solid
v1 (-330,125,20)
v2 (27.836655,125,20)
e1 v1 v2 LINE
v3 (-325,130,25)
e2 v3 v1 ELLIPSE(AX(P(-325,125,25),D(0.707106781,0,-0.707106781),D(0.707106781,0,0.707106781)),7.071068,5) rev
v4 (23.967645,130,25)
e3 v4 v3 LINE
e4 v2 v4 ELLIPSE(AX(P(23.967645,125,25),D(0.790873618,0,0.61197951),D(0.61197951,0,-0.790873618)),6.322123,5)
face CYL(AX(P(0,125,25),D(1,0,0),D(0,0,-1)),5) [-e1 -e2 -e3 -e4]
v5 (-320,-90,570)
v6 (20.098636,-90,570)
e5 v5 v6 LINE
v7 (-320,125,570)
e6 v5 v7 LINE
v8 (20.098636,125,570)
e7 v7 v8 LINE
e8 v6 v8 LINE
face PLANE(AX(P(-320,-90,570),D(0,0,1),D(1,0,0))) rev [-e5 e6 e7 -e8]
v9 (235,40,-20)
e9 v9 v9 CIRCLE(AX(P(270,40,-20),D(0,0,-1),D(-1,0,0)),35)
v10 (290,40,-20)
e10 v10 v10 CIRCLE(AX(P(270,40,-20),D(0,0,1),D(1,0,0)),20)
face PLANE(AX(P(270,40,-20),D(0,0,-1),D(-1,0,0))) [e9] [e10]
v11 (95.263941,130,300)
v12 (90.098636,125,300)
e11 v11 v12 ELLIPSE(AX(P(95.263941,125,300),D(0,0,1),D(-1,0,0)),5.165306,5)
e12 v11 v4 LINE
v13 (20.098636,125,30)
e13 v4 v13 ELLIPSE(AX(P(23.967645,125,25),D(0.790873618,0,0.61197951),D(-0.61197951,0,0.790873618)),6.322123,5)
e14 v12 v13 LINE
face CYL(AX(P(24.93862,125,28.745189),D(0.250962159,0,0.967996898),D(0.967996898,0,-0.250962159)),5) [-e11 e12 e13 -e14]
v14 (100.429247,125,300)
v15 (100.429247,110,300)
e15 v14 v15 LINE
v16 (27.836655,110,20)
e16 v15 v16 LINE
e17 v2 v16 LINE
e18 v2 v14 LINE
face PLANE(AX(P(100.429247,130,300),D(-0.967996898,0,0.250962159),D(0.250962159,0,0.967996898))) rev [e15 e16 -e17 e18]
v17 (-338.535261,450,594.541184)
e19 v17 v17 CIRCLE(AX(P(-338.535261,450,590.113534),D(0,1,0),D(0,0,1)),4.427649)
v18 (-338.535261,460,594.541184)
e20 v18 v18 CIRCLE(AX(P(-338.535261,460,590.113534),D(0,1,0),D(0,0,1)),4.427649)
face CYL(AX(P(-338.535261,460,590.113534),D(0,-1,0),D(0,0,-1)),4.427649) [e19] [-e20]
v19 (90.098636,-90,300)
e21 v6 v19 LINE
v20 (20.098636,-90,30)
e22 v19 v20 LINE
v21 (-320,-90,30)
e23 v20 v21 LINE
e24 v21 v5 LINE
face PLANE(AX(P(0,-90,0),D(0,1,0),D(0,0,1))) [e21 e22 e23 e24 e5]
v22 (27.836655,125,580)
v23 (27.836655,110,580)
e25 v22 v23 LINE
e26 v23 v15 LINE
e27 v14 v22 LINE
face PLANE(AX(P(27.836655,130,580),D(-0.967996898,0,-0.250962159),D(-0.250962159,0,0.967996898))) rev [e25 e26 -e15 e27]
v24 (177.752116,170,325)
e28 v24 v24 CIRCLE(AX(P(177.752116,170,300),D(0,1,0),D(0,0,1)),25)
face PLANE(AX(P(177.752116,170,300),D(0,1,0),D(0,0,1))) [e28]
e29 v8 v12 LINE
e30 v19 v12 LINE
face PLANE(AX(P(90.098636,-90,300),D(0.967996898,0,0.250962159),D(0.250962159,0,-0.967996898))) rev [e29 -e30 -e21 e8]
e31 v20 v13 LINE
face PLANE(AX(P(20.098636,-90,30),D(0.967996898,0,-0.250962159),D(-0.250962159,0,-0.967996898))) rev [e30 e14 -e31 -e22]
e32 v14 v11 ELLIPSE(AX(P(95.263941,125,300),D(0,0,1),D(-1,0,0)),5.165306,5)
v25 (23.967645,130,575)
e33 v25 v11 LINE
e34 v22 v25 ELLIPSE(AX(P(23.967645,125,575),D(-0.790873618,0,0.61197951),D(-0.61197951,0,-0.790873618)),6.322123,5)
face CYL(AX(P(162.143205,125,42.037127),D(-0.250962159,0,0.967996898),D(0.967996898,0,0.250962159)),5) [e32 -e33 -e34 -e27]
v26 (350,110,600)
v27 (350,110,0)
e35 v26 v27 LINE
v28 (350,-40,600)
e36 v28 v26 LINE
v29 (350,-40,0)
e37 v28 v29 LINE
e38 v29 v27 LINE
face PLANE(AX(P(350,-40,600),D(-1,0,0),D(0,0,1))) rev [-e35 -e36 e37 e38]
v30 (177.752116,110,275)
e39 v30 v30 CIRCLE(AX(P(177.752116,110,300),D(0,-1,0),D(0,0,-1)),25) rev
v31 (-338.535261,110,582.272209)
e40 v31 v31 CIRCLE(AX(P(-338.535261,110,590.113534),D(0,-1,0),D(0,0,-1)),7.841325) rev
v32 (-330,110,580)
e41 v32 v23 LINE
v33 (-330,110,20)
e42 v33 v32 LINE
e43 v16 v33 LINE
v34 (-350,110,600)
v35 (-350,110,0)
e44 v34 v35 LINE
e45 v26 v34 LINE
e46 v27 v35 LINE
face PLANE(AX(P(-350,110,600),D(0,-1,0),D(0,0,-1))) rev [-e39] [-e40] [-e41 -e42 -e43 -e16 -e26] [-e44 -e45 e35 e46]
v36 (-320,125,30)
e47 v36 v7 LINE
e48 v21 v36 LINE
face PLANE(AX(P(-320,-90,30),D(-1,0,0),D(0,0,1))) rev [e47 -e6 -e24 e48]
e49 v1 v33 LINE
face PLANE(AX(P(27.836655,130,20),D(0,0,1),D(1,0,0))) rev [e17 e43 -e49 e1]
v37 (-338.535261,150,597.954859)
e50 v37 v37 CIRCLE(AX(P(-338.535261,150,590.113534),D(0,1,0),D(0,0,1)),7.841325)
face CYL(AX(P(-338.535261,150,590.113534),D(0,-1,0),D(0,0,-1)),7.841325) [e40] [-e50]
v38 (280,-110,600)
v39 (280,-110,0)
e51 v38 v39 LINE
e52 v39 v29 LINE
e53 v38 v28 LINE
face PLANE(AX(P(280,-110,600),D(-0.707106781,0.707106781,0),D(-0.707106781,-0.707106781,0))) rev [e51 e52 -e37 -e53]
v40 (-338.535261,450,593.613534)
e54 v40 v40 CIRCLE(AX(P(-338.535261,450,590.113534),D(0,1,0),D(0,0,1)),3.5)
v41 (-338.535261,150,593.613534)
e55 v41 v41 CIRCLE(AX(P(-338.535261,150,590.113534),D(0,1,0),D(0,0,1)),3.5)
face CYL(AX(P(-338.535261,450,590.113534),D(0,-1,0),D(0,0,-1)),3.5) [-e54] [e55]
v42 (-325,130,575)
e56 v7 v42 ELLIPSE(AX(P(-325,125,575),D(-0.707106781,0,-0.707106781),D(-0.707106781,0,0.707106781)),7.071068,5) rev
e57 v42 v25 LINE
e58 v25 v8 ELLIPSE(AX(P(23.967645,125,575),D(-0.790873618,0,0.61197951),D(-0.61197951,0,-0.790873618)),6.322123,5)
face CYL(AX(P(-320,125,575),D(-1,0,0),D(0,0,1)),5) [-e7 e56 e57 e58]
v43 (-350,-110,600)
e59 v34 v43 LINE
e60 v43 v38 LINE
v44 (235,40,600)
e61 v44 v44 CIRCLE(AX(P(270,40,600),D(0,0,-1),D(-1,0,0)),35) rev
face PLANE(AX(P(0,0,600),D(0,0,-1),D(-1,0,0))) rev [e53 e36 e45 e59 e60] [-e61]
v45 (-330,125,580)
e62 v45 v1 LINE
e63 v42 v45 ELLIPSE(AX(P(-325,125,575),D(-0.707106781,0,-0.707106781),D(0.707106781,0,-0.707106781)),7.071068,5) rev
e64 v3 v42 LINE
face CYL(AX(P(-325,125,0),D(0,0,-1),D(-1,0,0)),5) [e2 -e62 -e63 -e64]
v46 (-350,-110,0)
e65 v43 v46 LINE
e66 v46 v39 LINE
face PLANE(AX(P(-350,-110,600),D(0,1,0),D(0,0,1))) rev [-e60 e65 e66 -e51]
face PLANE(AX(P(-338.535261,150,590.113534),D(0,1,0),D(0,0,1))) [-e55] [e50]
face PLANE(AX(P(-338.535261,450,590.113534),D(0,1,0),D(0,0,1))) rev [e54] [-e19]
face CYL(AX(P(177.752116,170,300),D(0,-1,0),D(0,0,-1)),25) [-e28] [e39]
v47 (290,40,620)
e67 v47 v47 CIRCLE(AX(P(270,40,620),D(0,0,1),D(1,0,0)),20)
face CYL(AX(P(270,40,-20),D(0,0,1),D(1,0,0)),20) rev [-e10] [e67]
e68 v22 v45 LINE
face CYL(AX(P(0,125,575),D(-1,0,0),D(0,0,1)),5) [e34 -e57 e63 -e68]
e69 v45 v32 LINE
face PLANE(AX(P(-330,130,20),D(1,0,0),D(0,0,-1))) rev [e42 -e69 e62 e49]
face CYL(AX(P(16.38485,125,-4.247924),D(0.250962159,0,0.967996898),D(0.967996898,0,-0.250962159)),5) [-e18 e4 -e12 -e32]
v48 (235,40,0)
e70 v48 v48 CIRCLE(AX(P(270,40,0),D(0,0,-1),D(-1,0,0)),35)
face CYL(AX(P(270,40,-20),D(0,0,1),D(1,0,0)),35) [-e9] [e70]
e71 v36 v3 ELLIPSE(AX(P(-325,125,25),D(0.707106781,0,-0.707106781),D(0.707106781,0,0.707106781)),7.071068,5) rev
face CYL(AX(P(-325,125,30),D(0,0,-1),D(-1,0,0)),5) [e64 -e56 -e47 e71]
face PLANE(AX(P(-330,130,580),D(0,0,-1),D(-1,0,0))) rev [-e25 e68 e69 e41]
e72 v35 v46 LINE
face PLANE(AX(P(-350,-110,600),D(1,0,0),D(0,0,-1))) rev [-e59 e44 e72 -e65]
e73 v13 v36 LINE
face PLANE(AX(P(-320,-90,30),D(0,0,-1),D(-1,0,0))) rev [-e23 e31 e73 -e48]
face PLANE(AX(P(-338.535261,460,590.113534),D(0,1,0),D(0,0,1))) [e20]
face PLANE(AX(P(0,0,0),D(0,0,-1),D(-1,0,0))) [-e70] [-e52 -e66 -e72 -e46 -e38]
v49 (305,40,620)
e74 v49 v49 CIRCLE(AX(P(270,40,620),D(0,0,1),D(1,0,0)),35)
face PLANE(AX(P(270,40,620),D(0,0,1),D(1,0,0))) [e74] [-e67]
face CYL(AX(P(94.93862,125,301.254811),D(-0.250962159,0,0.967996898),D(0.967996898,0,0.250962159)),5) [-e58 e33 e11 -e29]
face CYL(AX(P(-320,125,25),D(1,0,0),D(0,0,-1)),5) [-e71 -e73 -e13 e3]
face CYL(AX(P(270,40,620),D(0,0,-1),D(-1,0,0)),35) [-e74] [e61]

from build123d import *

# Parameters (mm, degrees)
BOSS_EXTRUDE1_DEPTH = 600
CUT_EXTRUDE1_DEPTH  = 200
BOSS_EXTRUDE2_DEPTH = 20
FILLET1_R           = 5
SKETCH4_R           = 35
BOSS_EXTRUDE3_DEPTH = 20
BOSS_EXTRUDE4_START = 20
SKETCH5_R           = 35
BOSS_EXTRUDE4_DEPTH = 20
SKETCH6_R           = 10
CUT_EXTRUDE2_DEPTH  = 741.945342114
SKETCH7_R           = 25
BOSS_EXTRUDE5_DEPTH = 60
SKETCH9_R           = 20
CUT_EXTRUDE3_DEPTH  = 749.999332443
SKETCH10_R          = 7.841324839
BOSS_EXTRUDE6_DEPTH = 40
SKETCH11_R          = 3.5
BOSS_EXTRUDE7_DEPTH = 300
SKETCH12_R          = 4.427649499
BOSS_EXTRUDE8_DEPTH = 10


with BuildPart() as part:
    # Sketch1 → Boss-Extrude1 (new body)
    with BuildSketch(Plane.XY):
        Polygon((280, -110), (350, -40), (350, 110), (-350, 110), (-350, -110), align=None)
    extrude(amount=BOSS_EXTRUDE1_DEPTH)

    # Sketch2 → Cut-Extrude1 (cut)
    with BuildSketch(Plane(origin=(0, 110, 0), x_dir=(1, 0, 0), z_dir=(0, 1, 0))):
        Polygon((20.098635598, -30), (90.098635598, -300), (20.098635598, -570), (-320, -570), (-320, -30), align=None)
    extrude(amount=-CUT_EXTRUDE1_DEPTH, mode=Mode.SUBTRACT)

    # Sketch3 → Boss-Extrude2 (add)
    with BuildSketch(Plane(origin=(0, 110, 0), x_dir=(1, 0, 0), z_dir=(0, 1, 0))):
        Polygon((-330, -20), (-330, -580), (27.836654621, -580), (100.429247214, -300), (27.836654621, -20), align=None)
        Polygon((-320, -30), (-320, -570), (20.098635598, -570), (90.098635598, -300), (20.098635598, -30), align=None, mode=Mode.SUBTRACT)
    extrude(amount=BOSS_EXTRUDE2_DEPTH)

    # Fillet1
    fillet1_edges = [part.edges().sort_by_distance(p)[0] for p in [
        (-151.081672689, 130, 20),
        (-330, 130, 300),
        (-151.081672689, 130, 580),
        (64.132950917, 130, 440),
        (64.132950917, 130, 160),
        (-149.950682201, 130, 30),
        (-320, 130, 300),
        (-149.950682201, 130, 570),
        (55.098635598, 130, 435),
        (55.098635598, 130, 165),
    ]]
    fillet(fillet1_edges, radius=FILLET1_R - 0.0001)  # a hair under: the kernel refuses the full size

    # Sketch4 → Boss-Extrude3 (add)
    with BuildSketch(Plane.XY.offset(600)):
        with Locations(Location((270, 40, 0), (0, 0, 180))):
            Circle(SKETCH4_R)
    extrude(amount=BOSS_EXTRUDE3_DEPTH)

    # Sketch5 → Boss-Extrude4 (add)
    with BuildSketch(Plane(origin=(0, 0, 0), x_dir=(-1, 0, 0), z_dir=(0, 0, -1)).offset(BOSS_EXTRUDE4_START)):
        with Locations((-270, 40)):
            Circle(SKETCH5_R)
    extrude(amount=-BOSS_EXTRUDE4_DEPTH)

    # Sketch6 → Cut-Extrude2 (cut, through all)
    with BuildSketch(Plane.XY.offset(620)):
        with Locations((270, 40)):
            Circle(SKETCH6_R)
    extrude(amount=-CUT_EXTRUDE2_DEPTH, mode=Mode.SUBTRACT)

    # Sketch7 → Boss-Extrude5 (add)
    with BuildSketch(Plane(origin=(0, 110, 0), x_dir=(1, 0, 0), z_dir=(0, 1, 0))):
        with Locations(Location((177.752116484, -300, 0), (0, 0, 90))):
            Circle(SKETCH7_R)
    extrude(amount=BOSS_EXTRUDE5_DEPTH)

    # Sketch9 → Cut-Extrude3 (cut, through all)
    with BuildSketch(Plane.XY.offset(620)):
        with Locations((270, 40)):
            Circle(SKETCH9_R)
    extrude(amount=-CUT_EXTRUDE3_DEPTH, mode=Mode.SUBTRACT)

    # Sketch10 → Boss-Extrude6 (add)
    with BuildSketch(Plane(origin=(0, 110, 0), x_dir=(1, 0, 0), z_dir=(0, 1, 0))):
        with Locations(Location((-338.53526131, -590.113534013, 0), (0, 0, 90))):
            Circle(SKETCH10_R)
    extrude(amount=BOSS_EXTRUDE6_DEPTH)

    # Sketch11 → Boss-Extrude7 (add)
    with BuildSketch(Plane(origin=(0, 150, 0), x_dir=(1, 0, 0), z_dir=(0, 1, 0))):
        with Locations(Location((-338.53526131, -590.113534013, 0), (0, 0, 270))):
            Circle(SKETCH11_R)
    extrude(amount=BOSS_EXTRUDE7_DEPTH)

    # Sketch12 → Boss-Extrude8 (add)
    with BuildSketch(Plane(origin=(0, 450, 0), x_dir=(1, 0, 0), z_dir=(0, 1, 0))):
        with Locations(Location((-338.53526131, -590.113534013, 0), (0, 0, 270))):
            Circle(SKETCH12_R)
    extrude(amount=BOSS_EXTRUDE8_DEPTH)


solid = part.part
